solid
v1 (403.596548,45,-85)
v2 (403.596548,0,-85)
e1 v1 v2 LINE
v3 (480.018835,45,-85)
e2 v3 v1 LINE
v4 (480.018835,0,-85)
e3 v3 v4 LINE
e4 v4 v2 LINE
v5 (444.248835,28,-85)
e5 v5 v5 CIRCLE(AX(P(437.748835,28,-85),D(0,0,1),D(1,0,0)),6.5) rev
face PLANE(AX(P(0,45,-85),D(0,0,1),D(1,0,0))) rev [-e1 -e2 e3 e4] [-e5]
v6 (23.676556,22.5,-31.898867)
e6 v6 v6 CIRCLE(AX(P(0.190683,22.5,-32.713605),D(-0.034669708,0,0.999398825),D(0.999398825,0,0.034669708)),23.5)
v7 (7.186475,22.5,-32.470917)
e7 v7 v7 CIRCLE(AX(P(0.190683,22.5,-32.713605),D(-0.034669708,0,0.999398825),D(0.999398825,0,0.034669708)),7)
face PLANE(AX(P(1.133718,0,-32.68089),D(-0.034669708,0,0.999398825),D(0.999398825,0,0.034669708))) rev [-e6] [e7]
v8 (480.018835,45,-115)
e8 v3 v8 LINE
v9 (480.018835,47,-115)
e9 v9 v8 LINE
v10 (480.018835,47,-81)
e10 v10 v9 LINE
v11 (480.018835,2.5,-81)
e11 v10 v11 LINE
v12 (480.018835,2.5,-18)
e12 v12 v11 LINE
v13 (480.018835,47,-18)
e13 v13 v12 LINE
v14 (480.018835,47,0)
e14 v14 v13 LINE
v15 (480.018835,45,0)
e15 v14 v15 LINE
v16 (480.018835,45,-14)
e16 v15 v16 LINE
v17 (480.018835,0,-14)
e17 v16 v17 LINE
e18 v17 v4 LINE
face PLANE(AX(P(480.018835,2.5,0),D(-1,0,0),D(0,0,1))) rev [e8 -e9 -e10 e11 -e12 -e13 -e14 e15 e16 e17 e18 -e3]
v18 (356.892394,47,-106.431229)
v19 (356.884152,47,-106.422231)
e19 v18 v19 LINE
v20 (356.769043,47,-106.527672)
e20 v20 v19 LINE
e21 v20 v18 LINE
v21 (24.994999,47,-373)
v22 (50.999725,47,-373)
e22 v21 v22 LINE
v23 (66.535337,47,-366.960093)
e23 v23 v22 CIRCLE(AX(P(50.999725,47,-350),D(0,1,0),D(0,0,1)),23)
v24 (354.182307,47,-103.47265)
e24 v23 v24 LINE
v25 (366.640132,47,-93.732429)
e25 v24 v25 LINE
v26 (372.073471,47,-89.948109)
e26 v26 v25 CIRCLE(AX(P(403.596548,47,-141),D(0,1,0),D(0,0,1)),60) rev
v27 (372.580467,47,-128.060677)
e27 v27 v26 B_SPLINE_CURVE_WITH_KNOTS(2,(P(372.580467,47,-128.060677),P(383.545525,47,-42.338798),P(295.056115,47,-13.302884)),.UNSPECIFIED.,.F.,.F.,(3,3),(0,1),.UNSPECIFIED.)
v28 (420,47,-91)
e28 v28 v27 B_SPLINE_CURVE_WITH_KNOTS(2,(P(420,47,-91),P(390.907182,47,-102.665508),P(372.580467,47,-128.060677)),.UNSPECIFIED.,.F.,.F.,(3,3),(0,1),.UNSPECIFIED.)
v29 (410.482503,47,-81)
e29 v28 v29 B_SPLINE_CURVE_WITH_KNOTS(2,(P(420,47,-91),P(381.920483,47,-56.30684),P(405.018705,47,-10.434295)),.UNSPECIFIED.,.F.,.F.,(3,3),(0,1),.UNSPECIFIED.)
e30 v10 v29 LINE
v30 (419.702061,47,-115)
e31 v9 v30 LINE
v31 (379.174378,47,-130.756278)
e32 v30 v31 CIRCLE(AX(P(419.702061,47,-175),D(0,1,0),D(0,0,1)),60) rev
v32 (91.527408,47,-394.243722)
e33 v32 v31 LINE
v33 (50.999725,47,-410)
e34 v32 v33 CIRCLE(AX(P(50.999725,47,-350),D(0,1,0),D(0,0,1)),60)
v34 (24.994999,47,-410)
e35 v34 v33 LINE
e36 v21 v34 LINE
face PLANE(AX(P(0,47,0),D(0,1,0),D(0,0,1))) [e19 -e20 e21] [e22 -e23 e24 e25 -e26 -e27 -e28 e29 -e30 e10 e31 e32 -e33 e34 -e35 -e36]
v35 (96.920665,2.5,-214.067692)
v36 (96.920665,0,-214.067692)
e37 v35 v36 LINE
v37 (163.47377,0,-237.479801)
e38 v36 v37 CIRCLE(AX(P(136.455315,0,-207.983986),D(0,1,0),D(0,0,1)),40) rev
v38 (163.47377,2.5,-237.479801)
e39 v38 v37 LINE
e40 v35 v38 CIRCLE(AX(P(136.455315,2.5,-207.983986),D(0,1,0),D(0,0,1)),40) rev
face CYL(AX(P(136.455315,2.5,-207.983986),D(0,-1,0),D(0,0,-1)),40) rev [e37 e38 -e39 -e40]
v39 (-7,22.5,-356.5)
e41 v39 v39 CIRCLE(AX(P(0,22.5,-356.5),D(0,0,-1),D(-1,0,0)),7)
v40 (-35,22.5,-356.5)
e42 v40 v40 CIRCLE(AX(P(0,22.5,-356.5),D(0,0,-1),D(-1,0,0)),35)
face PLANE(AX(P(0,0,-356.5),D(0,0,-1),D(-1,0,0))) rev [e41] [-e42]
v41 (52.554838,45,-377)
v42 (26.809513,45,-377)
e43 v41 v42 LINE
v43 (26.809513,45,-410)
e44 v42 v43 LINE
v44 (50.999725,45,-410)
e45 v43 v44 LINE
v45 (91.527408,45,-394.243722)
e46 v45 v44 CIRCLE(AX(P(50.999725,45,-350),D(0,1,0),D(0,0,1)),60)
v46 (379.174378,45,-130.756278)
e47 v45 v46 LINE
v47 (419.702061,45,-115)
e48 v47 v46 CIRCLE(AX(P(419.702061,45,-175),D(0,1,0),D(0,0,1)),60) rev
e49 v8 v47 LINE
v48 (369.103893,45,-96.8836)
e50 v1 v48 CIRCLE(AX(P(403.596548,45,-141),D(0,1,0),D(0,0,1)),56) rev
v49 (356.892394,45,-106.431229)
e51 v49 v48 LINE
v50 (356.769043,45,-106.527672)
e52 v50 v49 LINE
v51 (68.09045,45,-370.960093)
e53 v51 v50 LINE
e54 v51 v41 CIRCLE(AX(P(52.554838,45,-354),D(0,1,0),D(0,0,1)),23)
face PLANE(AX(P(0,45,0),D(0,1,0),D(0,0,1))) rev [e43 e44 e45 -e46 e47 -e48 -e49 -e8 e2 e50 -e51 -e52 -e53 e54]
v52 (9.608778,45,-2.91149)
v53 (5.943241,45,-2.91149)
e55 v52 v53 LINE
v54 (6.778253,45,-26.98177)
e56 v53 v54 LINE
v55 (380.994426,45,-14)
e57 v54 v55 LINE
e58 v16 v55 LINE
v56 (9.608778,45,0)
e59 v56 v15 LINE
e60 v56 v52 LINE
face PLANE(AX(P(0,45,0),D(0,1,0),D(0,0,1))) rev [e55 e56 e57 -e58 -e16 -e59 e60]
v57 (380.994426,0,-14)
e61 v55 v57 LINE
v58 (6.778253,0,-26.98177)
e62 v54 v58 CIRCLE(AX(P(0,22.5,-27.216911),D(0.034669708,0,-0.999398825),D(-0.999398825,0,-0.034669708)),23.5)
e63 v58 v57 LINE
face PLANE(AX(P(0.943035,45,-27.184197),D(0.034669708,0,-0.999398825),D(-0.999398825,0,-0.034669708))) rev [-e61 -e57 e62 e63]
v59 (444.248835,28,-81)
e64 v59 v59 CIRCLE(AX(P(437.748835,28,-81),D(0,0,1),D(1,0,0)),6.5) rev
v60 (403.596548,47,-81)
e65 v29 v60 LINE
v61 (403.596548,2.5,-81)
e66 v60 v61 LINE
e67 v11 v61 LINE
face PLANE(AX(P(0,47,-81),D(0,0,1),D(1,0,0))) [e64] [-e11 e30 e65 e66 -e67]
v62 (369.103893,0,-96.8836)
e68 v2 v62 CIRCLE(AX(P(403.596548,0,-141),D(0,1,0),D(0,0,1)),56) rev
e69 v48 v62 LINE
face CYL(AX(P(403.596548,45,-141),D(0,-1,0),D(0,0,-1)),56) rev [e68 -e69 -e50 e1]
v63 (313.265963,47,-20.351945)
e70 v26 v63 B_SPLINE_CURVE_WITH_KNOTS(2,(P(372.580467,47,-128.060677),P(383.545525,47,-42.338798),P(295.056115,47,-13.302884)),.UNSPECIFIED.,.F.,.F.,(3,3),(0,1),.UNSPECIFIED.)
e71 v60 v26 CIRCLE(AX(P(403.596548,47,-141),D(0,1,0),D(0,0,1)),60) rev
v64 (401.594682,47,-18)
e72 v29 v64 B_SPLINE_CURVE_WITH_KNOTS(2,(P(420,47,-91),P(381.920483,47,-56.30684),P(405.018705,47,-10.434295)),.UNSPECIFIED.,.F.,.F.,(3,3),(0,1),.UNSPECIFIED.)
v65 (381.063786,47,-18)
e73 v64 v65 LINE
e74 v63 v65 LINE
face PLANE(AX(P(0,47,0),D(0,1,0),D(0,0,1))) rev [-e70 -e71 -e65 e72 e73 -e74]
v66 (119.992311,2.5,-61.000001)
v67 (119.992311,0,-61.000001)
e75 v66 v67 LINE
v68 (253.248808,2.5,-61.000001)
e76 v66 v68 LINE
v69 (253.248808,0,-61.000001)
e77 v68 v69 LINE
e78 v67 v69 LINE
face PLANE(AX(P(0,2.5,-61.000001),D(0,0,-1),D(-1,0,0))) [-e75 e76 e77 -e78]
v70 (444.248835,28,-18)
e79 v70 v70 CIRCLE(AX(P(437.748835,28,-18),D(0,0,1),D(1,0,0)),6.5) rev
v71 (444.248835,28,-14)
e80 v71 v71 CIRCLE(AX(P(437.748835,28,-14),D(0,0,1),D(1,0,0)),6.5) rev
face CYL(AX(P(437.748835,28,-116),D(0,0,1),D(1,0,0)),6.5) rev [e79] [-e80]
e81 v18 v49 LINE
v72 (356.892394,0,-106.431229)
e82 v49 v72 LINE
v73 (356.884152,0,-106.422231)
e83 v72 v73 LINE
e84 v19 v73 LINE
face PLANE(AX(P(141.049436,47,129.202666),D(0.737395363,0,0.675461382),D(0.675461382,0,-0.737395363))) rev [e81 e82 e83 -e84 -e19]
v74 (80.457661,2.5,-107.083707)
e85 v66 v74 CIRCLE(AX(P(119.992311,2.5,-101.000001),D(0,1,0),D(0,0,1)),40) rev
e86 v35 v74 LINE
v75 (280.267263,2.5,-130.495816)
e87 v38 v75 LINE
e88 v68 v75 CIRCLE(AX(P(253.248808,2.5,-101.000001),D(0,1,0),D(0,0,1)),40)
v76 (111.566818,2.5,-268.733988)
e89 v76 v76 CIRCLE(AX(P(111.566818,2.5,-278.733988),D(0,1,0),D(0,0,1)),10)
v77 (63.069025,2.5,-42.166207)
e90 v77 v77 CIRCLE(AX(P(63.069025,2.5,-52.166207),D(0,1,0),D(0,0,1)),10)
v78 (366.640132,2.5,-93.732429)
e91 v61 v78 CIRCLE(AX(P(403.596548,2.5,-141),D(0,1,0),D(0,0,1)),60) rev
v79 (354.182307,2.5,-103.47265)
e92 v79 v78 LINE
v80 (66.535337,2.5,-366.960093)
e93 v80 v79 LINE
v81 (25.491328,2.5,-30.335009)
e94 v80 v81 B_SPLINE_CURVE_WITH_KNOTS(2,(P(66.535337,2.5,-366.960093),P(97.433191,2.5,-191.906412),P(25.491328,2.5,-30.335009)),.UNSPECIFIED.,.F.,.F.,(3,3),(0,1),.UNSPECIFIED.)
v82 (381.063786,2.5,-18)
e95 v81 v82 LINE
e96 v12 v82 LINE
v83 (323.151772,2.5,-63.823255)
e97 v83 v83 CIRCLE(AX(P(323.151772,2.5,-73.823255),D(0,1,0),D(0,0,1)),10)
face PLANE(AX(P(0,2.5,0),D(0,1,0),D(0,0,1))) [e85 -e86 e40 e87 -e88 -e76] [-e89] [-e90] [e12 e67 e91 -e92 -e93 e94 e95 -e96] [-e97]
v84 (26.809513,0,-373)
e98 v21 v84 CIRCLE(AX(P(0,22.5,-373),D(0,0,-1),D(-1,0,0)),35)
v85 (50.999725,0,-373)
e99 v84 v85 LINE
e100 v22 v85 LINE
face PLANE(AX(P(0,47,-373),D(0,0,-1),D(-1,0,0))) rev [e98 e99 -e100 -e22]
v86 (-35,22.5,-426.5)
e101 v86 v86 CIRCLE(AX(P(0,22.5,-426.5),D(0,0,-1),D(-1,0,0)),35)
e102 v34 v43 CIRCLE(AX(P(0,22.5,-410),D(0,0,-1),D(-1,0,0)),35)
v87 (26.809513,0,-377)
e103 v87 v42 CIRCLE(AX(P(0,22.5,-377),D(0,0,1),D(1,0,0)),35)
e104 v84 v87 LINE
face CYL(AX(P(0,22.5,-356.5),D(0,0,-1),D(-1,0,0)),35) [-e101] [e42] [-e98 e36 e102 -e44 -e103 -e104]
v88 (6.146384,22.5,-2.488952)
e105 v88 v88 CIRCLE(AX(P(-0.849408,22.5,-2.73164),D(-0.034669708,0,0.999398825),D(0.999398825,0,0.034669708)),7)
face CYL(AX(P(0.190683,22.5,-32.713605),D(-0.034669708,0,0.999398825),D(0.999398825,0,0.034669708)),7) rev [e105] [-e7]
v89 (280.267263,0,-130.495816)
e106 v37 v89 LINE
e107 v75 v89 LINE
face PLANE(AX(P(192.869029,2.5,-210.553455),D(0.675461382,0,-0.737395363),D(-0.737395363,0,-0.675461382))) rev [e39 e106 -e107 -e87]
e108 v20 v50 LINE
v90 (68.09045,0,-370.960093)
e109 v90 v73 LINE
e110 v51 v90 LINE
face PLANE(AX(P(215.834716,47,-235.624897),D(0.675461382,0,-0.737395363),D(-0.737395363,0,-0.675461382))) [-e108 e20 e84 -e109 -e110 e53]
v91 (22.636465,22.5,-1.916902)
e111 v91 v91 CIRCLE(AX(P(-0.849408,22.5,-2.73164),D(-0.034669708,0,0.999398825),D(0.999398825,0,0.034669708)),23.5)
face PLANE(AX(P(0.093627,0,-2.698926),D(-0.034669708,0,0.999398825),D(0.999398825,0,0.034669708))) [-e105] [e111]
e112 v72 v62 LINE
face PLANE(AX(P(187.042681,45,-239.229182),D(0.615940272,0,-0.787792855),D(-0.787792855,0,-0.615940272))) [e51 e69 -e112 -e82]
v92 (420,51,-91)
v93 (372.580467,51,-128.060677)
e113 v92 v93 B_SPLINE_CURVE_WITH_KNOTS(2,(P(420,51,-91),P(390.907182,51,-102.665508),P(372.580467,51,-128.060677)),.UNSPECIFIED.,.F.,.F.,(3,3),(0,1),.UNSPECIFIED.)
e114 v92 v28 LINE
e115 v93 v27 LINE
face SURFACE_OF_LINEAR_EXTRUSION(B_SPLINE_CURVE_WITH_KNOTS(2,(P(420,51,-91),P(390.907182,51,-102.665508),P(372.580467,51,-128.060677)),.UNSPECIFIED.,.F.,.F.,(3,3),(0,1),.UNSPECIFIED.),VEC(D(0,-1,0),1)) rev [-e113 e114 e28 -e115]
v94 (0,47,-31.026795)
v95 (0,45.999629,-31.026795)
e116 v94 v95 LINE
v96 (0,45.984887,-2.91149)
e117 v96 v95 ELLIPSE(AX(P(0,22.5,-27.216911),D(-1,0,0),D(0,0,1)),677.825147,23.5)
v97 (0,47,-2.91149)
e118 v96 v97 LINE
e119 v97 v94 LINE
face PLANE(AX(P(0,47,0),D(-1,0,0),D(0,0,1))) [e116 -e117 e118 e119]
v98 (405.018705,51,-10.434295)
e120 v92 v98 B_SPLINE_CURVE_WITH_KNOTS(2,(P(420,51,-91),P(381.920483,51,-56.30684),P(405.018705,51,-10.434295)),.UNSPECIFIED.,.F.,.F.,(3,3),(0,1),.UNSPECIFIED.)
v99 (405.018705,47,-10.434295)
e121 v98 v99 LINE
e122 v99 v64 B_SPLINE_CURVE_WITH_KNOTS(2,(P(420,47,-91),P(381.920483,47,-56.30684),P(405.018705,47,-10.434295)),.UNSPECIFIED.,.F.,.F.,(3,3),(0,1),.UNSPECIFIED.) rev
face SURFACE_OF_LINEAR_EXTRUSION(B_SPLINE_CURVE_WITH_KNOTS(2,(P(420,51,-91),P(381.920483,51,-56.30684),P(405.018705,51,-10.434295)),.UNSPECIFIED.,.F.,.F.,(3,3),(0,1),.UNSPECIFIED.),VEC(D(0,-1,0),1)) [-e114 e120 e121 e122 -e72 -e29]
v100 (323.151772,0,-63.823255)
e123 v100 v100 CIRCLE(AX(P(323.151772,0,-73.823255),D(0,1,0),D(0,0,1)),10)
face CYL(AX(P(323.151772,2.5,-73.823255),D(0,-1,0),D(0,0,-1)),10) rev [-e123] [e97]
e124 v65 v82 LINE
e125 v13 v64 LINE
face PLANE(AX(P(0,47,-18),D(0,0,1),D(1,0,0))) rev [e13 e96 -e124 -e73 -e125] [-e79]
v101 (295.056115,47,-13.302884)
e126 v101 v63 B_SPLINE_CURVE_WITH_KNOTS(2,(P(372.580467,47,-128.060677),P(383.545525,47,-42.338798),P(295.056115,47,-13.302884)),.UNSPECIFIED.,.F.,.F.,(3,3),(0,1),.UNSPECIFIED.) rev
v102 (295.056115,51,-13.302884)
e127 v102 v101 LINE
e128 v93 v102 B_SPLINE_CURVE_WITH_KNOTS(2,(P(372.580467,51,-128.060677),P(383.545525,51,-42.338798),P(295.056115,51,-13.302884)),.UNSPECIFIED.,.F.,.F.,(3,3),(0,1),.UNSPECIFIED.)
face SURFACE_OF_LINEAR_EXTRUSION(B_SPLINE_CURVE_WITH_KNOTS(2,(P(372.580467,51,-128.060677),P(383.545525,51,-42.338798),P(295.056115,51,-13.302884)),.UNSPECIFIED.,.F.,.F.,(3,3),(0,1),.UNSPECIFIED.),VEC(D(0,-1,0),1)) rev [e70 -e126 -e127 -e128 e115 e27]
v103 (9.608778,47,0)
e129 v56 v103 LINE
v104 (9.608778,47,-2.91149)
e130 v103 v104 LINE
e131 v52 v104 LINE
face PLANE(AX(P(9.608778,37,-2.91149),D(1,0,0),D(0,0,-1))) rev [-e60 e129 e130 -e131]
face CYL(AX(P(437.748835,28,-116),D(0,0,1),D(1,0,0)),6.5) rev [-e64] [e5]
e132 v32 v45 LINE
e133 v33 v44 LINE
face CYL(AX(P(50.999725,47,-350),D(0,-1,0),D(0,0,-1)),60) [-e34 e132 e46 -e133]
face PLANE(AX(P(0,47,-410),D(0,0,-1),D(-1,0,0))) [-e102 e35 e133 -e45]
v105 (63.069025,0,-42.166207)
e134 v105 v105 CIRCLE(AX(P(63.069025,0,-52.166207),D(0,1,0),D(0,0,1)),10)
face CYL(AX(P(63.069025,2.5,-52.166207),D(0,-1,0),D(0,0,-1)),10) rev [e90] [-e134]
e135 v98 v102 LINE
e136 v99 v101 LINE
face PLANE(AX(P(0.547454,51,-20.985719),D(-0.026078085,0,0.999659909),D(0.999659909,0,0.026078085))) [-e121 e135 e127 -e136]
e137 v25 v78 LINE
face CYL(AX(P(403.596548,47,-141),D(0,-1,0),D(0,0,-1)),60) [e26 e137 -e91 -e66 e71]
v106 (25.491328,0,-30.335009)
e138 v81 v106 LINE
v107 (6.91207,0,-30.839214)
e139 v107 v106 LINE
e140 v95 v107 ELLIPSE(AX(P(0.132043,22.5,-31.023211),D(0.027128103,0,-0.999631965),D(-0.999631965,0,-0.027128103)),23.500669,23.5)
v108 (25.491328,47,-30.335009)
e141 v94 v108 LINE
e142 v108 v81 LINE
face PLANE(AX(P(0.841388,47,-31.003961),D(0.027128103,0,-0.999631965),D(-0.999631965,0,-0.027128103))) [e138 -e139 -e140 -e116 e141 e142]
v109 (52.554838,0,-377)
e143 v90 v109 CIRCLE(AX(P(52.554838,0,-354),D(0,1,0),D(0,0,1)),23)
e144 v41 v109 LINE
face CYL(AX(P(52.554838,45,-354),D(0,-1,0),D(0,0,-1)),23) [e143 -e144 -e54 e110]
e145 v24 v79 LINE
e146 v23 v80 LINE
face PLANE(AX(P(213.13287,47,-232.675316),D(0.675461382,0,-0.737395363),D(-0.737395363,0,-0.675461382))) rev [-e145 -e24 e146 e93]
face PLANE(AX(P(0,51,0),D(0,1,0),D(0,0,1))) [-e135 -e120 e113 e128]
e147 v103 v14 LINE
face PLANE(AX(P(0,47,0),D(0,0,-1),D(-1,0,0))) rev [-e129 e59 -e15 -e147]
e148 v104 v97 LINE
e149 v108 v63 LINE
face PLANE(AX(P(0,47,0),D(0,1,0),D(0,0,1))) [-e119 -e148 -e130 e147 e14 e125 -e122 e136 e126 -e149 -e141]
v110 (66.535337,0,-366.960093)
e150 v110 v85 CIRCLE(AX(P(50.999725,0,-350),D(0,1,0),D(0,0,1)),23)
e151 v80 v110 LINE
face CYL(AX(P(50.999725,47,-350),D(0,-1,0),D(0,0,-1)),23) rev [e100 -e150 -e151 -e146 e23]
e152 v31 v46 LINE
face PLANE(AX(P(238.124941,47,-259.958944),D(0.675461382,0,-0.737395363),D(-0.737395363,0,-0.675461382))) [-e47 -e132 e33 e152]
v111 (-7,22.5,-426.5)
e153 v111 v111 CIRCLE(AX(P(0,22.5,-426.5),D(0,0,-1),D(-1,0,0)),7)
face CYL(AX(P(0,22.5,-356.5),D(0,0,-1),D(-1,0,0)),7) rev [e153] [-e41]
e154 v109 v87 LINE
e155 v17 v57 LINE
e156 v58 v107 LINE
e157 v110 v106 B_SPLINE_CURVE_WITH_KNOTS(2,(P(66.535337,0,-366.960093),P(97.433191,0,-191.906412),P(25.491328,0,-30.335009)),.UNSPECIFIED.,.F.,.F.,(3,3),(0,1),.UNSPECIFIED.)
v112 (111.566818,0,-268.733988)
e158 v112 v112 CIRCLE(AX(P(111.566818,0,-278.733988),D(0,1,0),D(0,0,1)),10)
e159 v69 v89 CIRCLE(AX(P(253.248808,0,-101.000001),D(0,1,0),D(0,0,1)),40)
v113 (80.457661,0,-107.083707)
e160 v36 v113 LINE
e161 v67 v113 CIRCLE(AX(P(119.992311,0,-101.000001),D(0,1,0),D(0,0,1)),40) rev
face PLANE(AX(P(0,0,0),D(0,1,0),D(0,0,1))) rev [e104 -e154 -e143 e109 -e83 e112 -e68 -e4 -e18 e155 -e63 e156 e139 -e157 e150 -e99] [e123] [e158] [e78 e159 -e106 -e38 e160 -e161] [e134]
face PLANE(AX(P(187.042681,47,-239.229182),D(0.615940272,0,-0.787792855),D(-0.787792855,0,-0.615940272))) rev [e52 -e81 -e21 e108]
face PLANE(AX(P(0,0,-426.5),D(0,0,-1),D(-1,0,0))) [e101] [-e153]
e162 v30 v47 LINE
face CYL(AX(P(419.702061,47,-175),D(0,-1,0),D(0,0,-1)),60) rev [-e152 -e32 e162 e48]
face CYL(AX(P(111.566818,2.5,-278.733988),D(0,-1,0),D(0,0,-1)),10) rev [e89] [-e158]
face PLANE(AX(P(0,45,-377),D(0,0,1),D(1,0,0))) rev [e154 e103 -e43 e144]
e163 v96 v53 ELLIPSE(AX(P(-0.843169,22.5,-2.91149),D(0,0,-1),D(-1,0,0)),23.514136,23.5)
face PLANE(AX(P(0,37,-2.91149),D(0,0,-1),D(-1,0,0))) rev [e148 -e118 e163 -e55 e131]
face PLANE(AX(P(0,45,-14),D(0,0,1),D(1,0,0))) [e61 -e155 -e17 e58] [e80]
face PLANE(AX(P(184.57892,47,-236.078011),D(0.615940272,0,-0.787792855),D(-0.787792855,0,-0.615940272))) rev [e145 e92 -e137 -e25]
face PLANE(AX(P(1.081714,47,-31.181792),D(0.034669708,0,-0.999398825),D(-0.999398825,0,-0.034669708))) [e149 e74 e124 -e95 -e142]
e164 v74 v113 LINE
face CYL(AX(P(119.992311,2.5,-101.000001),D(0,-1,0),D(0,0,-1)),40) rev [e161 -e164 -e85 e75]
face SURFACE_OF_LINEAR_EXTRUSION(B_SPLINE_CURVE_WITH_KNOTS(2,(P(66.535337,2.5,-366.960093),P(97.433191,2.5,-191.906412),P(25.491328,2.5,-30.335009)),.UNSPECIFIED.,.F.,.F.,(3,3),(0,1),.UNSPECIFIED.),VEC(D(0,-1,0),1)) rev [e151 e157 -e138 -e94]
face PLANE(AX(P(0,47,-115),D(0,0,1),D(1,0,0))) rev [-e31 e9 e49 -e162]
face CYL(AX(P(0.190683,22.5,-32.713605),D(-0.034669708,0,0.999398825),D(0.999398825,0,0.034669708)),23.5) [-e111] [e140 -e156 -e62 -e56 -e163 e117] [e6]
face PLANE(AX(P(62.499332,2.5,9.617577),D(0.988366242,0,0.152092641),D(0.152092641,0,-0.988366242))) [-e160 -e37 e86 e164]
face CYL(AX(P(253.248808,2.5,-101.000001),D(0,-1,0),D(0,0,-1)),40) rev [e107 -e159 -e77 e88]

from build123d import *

# Parameters (mm, degrees)
SKETCH_2_R               = 10
EXTRUDE_2_DEPTH          = 2.5
EXTRUDE_3_DEPTH          = 47
EXTRUDE_4_DEPTH          = 47
CUT_EXTRUDE_2_DEPTH      = 45
EXTRUDE_5_DEPTH          = 4
EXTRUDE_6_DEPTH          = 49.5
EXTRUDE_6_DEPTH_BACK     = 20.5
SKETCH_5_R               = 35
EXTRUDE_8_DEPTH          = 24.5
EXTRUDE_8_DEPTH_BACK     = 5.5
SKETCH_6_3_R             = 23.5
SKETCH_6_3_R_2           = 7
CUT_EXTRUDE_4_DEPTH      = 35.5
CUT_EXTRUDE_4_DEPTH_BACK = 24.5
SKETCH_6_R               = 7
CUT_EXTRUDE_5_DEPTH      = 31
CUT_EXTRUDE_5_DEPTH_BACK = 118
CUT_EXTRUDE_7_DEPTH      = 10
SKETCH_13_R              = 23.5
SKETCH_13_R_2            = 7
EXTRUDE_9_DEPTH          = 5
SKETCH_14_R              = 7
CUT_EXTRUDE_8_DEPTH      = 326


with BuildPart() as part:
    # 草图2 → 凸台-拉伸2 (new body)
    with BuildSketch(Plane(origin=(0, 0, 0), x_dir=(1, 0, 0), z_dir=(0, 1, 0))):
        with BuildLine():
            add(Edge.make_bspline(
                [(66.535337275, 366.960093359), (97.433190899, 191.906412215), (25.491327677, 30.335008843)],
                knots=[0, 0, 0, 1, 1, 1], degree=2))
            Line((25.491327677, 30.335008843), (298.070406458, 20.879087079))
            Line((298.070406458, 20.879087079), (381.06378597, 18))
            Line((381.06378597, 18), (480.018834564, 18))
            Line((480.018834564, 18), (480.018834564, 81))
            Line((480.018834564, 81), (403.59654847, 81))
            ThreePointArc((403.59654847, 81), (384.052422459, 84.272342385), (366.640132179, 93.732428718))
            Line((366.640132179, 93.732428718), (354.182306501, 103.472649748))
            Line((354.182306501, 103.472649748), (66.535337275, 366.960093359))
        make_face()
        with Locations((63.069024618, 52.166207095)):
            Circle(SKETCH_2_R, mode=Mode.SUBTRACT)
        with BuildLine():
            Line((210.484938228, 194.417109435), (265.843761834, 143.707884329))
            Line((265.843761834, 143.707884329), (280.267263132, 130.495815747))
            ThreePointArc((280.267263132, 130.495815747), (290.530388989, 86.505736508), (253.248807869, 61.00000121))
            Line((253.248807869, 61.00000121), (167.295718615, 61.00000121))
            Line((167.295718615, 61.00000121), (119.992311174, 61.00000121))
            ThreePointArc((119.992311174, 61.00000121), (89.633225011, 74.955311015), (80.457661489, 107.083706844))
            Line((80.457661489, 107.083706844), (96.920664861, 214.067691653))
            ThreePointArc((96.920664861, 214.067691653), (123.181449566, 245.717320201), (163.47376981, 237.479800556))
            Line((163.47376981, 237.479800556), (210.484938228, 194.417109435))
        make_face(mode=Mode.SUBTRACT)
        with Locations((323.151772468, 73.823254893)):
            Circle(SKETCH_2_R, mode=Mode.SUBTRACT)
        with Locations((111.566817708, 278.73398761)):
            Circle(SKETCH_2_R, mode=Mode.SUBTRACT)
    extrude(amount=EXTRUDE_2_DEPTH)

    # 草图2<4> → 凸台-拉伸3 (add)
    with BuildSketch(Plane(origin=(0, 0, 0), x_dir=(1, 0, 0), z_dir=(0, 1, 0))):
        Polygon((0, 31.026794813), (0, 27.216911211), (380.994425705, 14), (480.018834564, 14), (480.018834564, 18), (381.06378597, 18), (298.070406458, 20.879087079), (25.491327677, 30.335008843), align=None)
        with BuildLine():
            ThreePointArc((50.999725499, 373), (59.333927702, 371.436909143), (66.535337275, 366.960093359))
            Line((66.535337275, 366.960093359), (354.182306501, 103.472649748))
            Line((354.182306501, 103.472649748), (366.640132179, 93.732428718))
            ThreePointArc((366.640132179, 93.732428718), (384.052422459, 84.272342385), (403.59654847, 81))
            Line((403.59654847, 81), (480.018834564, 81))
            Line((480.018834564, 81), (480.018834564, 85))
            Line((480.018834564, 85), (403.59654847, 85))
            ThreePointArc((403.59654847, 85), (385.355364193, 88.054186226), (369.103893265, 96.883600137))
            Line((369.103893265, 96.883600137), (356.892394312, 106.431229232))
            Line((356.892394312, 106.431229232), (356.884152027, 106.422231202))
            Line((356.884152027, 106.422231202), (356.769043373, 106.527671857))
            Line((356.769043373, 106.527671857), (68.090449936, 370.960093359))
            ThreePointArc((68.090449936, 370.960093359), (60.889040363, 375.436909143), (52.554838159, 377))
            Line((52.554838159, 377), (0, 377))
            Line((0, 377), (0, 373))
            Line((0, 373), (50.999725499, 373))
        make_face()
    extrude(amount=EXTRUDE_3_DEPTH)

    # 草图2<6> → 凸台-拉伸4 (add)
    with BuildSketch(Plane(origin=(0, 0, 0), x_dir=(1, 0, 0), z_dir=(0, 1, 0))):
        Polygon((0, 0), (480.018834564, 0), (480.018834564, 13.998527319), (480.018834564, 18), (381.06378597, 18), (298.070406458, 20.879087079), (25.491327677, 30.335008843), (0, 31.026794813), align=None)
        with BuildLine():
            Line((403.59654847, 85), (480.018834564, 85))
            Line((480.018834564, 85), (480.018834564, 115))
            Line((480.018834564, 115), (419.702060514, 115))
            ThreePointArc((419.702060514, 115), (397.96066346, 119.077628321), (379.174377619, 130.756278195))
            Line((379.174377619, 130.756278195), (91.527408393, 394.243721805))
            ThreePointArc((91.527408393, 394.243721805), (72.741122552, 405.922371679), (50.999725499, 410))
            Line((50.999725499, 410), (0, 410))
            Line((0, 410), (0, 377))
            Line((0, 377), (52.554838159, 377))
            ThreePointArc((52.554838159, 377), (60.889040363, 375.436909143), (68.090449936, 370.960093359))
            Line((68.090449936, 370.960093359), (356.769043373, 106.527671857))
            Line((356.769043373, 106.527671857), (369.103893265, 96.883600137))
            ThreePointArc((369.103893265, 96.883600137), (385.355364193, 88.054186226), (403.59654847, 85))
        make_face()
    extrude(amount=EXTRUDE_4_DEPTH)

    # 草图2<8> → 切除-拉伸2 (cut)
    with BuildSketch(Plane(origin=(0, 0, 0), x_dir=(1, 0, 0), z_dir=(0, 1, 0))):
        Polygon((0, 27.216911211), (0, 0), (480.018834564, 0), (480.018834564, 13.998527319), (480.018834564, 14), (380.994425705, 14), align=None)
        with BuildLine():
            Line((403.59654847, 85), (480.018834564, 85))
            Line((480.018834564, 85), (480.018834564, 115))
            Line((480.018834564, 115), (419.702060514, 115))
            ThreePointArc((419.702060514, 115), (397.96066346, 119.077628321), (379.174377619, 130.756278195))
            Line((379.174377619, 130.756278195), (91.527408393, 394.243721805))
            ThreePointArc((91.527408393, 394.243721805), (72.741122552, 405.922371679), (50.999725499, 410))
            Line((50.999725499, 410), (0, 410))
            Line((0, 410), (0, 377))
            Line((0, 377), (52.554838159, 377))
            ThreePointArc((52.554838159, 377), (60.889040363, 375.436909143), (68.090449936, 370.960093359))
            Line((68.090449936, 370.960093359), (356.769043373, 106.527671857))
            Line((356.769043373, 106.527671857), (369.103893265, 96.883600137))
            ThreePointArc((369.103893265, 96.883600137), (385.355364193, 88.054186226), (403.59654847, 85))
        make_face()
    extrude(amount=CUT_EXTRUDE_2_DEPTH, mode=Mode.SUBTRACT)

    # 草图3 → 凸台-拉伸5 (add)
    with BuildSketch(Plane(origin=(0, 47, 0), x_dir=(1, 0, 0), z_dir=(0, 1, 0))):
        with BuildLine():
            Line((295.056115028, 13.302883956), (405.018705009, 10.434294652))
            add(Edge.make_bspline(
                [(405.018705009, 10.434294652), (381.920482995, 56.306840436), (420, 91)],
                knots=[0.140921029, 0.140921029, 0.140921029, 1.140921029, 1.140921029, 1.140921029], degree=2))
            add(Edge.make_bspline(
                [(420, 91), (390.907181835, 102.66550813), (372.580466903, 128.060677104)],
                knots=[0, 0, 0, 1, 1, 1], degree=2))
            add(Edge.make_bspline(
                [(372.580466903, 128.060677104), (383.545524604, 42.338798312), (295.056115028, 13.302883956)],
                knots=[0, 0, 0, 1, 1, 1], degree=2))
        make_face()
    extrude(amount=EXTRUDE_5_DEPTH)

    # 草图5 → 凸台-拉伸6 (add, two sides: drawn at the far end of the back side and taken through both)
    with BuildSketch(Plane(origin=(0, 0, -377), x_dir=(-1, 0, 0), z_dir=(0, 0, -1)).offset(-EXTRUDE_6_DEPTH_BACK)):
        with Locations((0, 22.5)):
            Circle(SKETCH_5_R)
        with BuildLine():
            ThreePointArc((7, 22.5), (4.949747468, 17.550252532), (0, 15.5))
            ThreePointArc((0, 15.5), (-7, 22.5), (0, 29.5))
            ThreePointArc((0, 29.5), (4.949747468, 27.449747468), (7, 22.5))
        make_face(mode=Mode.SUBTRACT)
    extrude(amount=EXTRUDE_6_DEPTH + EXTRUDE_6_DEPTH_BACK)

    # 草图6<3> → 凸台-拉伸8 (add, two sides: drawn at the far end of the back side and taken through both)
    with BuildSketch(Plane(origin=(0.943035097, 0, -27.184196792), x_dir=(0.9993988249637922, 0, 0.03466970811806164), z_dir=(-0.03466970811806164, 0, 0.9993988249637923)).offset(-EXTRUDE_8_DEPTH_BACK)):
        with Locations((-0.943602368, 22.5)):
            Circle(SKETCH_6_3_R)
        with Locations((-0.943602368, 22.5)):
            Circle(SKETCH_6_3_R_2, mode=Mode.SUBTRACT)
    extrude(amount=EXTRUDE_8_DEPTH + EXTRUDE_8_DEPTH_BACK)

    # 草图6 → 切除-拉伸4 (cut, two sides: drawn at the far end of the back side and taken through both)
    with BuildSketch(Plane(origin=(0.943035097, 0, -27.184196792), x_dir=(0.9993988249637922, 0, 0.03466970811806164), z_dir=(-0.03466970811806164, 0, 0.9993988249637923)).offset(-CUT_EXTRUDE_4_DEPTH_BACK)):
        with Locations((-0.943602368, 22.5)):
            Circle(SKETCH_6_R)
    extrude(amount=CUT_EXTRUDE_4_DEPTH + CUT_EXTRUDE_4_DEPTH_BACK, mode=Mode.SUBTRACT)

    # 草图10 → 切除-拉伸5 (cut, two sides: drawn at the far end of the back side and taken through both)
    with BuildSketch(Plane(origin=(0, 0, -85), x_dir=(-1, 0, 0), z_dir=(0, 0, -1)).offset(-CUT_EXTRUDE_5_DEPTH_BACK)):
        with BuildLine():
            ThreePointArc((-437.748834564, 21.5), (-433.152640486, 23.403805922), (-431.248834564, 28))
            ThreePointArc((-431.248834564, 28), (-442.345028641, 32.596194078), (-437.748834564, 21.5))
        make_face()
    extrude(amount=CUT_EXTRUDE_5_DEPTH + CUT_EXTRUDE_5_DEPTH_BACK, mode=Mode.SUBTRACT)

    # 草图12 → 切除-拉伸7 (cut)
    with BuildSketch(Plane(origin=(0, 47, 0), x_dir=(1, 0, 0), z_dir=(0, 1, 0))):
        Polygon((0, 0), (9.608777796, 0), (9.608777796, 2.511490201), (9.608777796, 2.911490201), (5, 2.911490201), (0, 2.911490201), (0, 2.3), align=None)
    extrude(amount=-CUT_EXTRUDE_7_DEPTH, mode=Mode.SUBTRACT)

    # 草图13 → 凸台-拉伸9 (add)
    with BuildSketch(Plane(origin=(0.093627248, 0, -2.698925581), x_dir=(0.9993988249637922, 0, 0.03466970811806163), z_dir=(-0.03466970811806163, 0, 0.9993988249637923))):
        with Locations((-0.943602368, 22.5)):
            Circle(SKETCH_13_R)
        with Locations((-0.943602368, 22.5)):
            Circle(SKETCH_13_R_2, mode=Mode.SUBTRACT)
    extrude(amount=-EXTRUDE_9_DEPTH)

    # 草图14 → 切除-拉伸8 (cut)
    with BuildSketch(Plane(origin=(0, 0, -426.5), x_dir=(-1, 0, 0), z_dir=(0, 0, -1))):
        with Locations((0, 22.5)):
            Circle(SKETCH_14_R)
    extrude(amount=-CUT_EXTRUDE_8_DEPTH, mode=Mode.SUBTRACT)


solid = part.part
